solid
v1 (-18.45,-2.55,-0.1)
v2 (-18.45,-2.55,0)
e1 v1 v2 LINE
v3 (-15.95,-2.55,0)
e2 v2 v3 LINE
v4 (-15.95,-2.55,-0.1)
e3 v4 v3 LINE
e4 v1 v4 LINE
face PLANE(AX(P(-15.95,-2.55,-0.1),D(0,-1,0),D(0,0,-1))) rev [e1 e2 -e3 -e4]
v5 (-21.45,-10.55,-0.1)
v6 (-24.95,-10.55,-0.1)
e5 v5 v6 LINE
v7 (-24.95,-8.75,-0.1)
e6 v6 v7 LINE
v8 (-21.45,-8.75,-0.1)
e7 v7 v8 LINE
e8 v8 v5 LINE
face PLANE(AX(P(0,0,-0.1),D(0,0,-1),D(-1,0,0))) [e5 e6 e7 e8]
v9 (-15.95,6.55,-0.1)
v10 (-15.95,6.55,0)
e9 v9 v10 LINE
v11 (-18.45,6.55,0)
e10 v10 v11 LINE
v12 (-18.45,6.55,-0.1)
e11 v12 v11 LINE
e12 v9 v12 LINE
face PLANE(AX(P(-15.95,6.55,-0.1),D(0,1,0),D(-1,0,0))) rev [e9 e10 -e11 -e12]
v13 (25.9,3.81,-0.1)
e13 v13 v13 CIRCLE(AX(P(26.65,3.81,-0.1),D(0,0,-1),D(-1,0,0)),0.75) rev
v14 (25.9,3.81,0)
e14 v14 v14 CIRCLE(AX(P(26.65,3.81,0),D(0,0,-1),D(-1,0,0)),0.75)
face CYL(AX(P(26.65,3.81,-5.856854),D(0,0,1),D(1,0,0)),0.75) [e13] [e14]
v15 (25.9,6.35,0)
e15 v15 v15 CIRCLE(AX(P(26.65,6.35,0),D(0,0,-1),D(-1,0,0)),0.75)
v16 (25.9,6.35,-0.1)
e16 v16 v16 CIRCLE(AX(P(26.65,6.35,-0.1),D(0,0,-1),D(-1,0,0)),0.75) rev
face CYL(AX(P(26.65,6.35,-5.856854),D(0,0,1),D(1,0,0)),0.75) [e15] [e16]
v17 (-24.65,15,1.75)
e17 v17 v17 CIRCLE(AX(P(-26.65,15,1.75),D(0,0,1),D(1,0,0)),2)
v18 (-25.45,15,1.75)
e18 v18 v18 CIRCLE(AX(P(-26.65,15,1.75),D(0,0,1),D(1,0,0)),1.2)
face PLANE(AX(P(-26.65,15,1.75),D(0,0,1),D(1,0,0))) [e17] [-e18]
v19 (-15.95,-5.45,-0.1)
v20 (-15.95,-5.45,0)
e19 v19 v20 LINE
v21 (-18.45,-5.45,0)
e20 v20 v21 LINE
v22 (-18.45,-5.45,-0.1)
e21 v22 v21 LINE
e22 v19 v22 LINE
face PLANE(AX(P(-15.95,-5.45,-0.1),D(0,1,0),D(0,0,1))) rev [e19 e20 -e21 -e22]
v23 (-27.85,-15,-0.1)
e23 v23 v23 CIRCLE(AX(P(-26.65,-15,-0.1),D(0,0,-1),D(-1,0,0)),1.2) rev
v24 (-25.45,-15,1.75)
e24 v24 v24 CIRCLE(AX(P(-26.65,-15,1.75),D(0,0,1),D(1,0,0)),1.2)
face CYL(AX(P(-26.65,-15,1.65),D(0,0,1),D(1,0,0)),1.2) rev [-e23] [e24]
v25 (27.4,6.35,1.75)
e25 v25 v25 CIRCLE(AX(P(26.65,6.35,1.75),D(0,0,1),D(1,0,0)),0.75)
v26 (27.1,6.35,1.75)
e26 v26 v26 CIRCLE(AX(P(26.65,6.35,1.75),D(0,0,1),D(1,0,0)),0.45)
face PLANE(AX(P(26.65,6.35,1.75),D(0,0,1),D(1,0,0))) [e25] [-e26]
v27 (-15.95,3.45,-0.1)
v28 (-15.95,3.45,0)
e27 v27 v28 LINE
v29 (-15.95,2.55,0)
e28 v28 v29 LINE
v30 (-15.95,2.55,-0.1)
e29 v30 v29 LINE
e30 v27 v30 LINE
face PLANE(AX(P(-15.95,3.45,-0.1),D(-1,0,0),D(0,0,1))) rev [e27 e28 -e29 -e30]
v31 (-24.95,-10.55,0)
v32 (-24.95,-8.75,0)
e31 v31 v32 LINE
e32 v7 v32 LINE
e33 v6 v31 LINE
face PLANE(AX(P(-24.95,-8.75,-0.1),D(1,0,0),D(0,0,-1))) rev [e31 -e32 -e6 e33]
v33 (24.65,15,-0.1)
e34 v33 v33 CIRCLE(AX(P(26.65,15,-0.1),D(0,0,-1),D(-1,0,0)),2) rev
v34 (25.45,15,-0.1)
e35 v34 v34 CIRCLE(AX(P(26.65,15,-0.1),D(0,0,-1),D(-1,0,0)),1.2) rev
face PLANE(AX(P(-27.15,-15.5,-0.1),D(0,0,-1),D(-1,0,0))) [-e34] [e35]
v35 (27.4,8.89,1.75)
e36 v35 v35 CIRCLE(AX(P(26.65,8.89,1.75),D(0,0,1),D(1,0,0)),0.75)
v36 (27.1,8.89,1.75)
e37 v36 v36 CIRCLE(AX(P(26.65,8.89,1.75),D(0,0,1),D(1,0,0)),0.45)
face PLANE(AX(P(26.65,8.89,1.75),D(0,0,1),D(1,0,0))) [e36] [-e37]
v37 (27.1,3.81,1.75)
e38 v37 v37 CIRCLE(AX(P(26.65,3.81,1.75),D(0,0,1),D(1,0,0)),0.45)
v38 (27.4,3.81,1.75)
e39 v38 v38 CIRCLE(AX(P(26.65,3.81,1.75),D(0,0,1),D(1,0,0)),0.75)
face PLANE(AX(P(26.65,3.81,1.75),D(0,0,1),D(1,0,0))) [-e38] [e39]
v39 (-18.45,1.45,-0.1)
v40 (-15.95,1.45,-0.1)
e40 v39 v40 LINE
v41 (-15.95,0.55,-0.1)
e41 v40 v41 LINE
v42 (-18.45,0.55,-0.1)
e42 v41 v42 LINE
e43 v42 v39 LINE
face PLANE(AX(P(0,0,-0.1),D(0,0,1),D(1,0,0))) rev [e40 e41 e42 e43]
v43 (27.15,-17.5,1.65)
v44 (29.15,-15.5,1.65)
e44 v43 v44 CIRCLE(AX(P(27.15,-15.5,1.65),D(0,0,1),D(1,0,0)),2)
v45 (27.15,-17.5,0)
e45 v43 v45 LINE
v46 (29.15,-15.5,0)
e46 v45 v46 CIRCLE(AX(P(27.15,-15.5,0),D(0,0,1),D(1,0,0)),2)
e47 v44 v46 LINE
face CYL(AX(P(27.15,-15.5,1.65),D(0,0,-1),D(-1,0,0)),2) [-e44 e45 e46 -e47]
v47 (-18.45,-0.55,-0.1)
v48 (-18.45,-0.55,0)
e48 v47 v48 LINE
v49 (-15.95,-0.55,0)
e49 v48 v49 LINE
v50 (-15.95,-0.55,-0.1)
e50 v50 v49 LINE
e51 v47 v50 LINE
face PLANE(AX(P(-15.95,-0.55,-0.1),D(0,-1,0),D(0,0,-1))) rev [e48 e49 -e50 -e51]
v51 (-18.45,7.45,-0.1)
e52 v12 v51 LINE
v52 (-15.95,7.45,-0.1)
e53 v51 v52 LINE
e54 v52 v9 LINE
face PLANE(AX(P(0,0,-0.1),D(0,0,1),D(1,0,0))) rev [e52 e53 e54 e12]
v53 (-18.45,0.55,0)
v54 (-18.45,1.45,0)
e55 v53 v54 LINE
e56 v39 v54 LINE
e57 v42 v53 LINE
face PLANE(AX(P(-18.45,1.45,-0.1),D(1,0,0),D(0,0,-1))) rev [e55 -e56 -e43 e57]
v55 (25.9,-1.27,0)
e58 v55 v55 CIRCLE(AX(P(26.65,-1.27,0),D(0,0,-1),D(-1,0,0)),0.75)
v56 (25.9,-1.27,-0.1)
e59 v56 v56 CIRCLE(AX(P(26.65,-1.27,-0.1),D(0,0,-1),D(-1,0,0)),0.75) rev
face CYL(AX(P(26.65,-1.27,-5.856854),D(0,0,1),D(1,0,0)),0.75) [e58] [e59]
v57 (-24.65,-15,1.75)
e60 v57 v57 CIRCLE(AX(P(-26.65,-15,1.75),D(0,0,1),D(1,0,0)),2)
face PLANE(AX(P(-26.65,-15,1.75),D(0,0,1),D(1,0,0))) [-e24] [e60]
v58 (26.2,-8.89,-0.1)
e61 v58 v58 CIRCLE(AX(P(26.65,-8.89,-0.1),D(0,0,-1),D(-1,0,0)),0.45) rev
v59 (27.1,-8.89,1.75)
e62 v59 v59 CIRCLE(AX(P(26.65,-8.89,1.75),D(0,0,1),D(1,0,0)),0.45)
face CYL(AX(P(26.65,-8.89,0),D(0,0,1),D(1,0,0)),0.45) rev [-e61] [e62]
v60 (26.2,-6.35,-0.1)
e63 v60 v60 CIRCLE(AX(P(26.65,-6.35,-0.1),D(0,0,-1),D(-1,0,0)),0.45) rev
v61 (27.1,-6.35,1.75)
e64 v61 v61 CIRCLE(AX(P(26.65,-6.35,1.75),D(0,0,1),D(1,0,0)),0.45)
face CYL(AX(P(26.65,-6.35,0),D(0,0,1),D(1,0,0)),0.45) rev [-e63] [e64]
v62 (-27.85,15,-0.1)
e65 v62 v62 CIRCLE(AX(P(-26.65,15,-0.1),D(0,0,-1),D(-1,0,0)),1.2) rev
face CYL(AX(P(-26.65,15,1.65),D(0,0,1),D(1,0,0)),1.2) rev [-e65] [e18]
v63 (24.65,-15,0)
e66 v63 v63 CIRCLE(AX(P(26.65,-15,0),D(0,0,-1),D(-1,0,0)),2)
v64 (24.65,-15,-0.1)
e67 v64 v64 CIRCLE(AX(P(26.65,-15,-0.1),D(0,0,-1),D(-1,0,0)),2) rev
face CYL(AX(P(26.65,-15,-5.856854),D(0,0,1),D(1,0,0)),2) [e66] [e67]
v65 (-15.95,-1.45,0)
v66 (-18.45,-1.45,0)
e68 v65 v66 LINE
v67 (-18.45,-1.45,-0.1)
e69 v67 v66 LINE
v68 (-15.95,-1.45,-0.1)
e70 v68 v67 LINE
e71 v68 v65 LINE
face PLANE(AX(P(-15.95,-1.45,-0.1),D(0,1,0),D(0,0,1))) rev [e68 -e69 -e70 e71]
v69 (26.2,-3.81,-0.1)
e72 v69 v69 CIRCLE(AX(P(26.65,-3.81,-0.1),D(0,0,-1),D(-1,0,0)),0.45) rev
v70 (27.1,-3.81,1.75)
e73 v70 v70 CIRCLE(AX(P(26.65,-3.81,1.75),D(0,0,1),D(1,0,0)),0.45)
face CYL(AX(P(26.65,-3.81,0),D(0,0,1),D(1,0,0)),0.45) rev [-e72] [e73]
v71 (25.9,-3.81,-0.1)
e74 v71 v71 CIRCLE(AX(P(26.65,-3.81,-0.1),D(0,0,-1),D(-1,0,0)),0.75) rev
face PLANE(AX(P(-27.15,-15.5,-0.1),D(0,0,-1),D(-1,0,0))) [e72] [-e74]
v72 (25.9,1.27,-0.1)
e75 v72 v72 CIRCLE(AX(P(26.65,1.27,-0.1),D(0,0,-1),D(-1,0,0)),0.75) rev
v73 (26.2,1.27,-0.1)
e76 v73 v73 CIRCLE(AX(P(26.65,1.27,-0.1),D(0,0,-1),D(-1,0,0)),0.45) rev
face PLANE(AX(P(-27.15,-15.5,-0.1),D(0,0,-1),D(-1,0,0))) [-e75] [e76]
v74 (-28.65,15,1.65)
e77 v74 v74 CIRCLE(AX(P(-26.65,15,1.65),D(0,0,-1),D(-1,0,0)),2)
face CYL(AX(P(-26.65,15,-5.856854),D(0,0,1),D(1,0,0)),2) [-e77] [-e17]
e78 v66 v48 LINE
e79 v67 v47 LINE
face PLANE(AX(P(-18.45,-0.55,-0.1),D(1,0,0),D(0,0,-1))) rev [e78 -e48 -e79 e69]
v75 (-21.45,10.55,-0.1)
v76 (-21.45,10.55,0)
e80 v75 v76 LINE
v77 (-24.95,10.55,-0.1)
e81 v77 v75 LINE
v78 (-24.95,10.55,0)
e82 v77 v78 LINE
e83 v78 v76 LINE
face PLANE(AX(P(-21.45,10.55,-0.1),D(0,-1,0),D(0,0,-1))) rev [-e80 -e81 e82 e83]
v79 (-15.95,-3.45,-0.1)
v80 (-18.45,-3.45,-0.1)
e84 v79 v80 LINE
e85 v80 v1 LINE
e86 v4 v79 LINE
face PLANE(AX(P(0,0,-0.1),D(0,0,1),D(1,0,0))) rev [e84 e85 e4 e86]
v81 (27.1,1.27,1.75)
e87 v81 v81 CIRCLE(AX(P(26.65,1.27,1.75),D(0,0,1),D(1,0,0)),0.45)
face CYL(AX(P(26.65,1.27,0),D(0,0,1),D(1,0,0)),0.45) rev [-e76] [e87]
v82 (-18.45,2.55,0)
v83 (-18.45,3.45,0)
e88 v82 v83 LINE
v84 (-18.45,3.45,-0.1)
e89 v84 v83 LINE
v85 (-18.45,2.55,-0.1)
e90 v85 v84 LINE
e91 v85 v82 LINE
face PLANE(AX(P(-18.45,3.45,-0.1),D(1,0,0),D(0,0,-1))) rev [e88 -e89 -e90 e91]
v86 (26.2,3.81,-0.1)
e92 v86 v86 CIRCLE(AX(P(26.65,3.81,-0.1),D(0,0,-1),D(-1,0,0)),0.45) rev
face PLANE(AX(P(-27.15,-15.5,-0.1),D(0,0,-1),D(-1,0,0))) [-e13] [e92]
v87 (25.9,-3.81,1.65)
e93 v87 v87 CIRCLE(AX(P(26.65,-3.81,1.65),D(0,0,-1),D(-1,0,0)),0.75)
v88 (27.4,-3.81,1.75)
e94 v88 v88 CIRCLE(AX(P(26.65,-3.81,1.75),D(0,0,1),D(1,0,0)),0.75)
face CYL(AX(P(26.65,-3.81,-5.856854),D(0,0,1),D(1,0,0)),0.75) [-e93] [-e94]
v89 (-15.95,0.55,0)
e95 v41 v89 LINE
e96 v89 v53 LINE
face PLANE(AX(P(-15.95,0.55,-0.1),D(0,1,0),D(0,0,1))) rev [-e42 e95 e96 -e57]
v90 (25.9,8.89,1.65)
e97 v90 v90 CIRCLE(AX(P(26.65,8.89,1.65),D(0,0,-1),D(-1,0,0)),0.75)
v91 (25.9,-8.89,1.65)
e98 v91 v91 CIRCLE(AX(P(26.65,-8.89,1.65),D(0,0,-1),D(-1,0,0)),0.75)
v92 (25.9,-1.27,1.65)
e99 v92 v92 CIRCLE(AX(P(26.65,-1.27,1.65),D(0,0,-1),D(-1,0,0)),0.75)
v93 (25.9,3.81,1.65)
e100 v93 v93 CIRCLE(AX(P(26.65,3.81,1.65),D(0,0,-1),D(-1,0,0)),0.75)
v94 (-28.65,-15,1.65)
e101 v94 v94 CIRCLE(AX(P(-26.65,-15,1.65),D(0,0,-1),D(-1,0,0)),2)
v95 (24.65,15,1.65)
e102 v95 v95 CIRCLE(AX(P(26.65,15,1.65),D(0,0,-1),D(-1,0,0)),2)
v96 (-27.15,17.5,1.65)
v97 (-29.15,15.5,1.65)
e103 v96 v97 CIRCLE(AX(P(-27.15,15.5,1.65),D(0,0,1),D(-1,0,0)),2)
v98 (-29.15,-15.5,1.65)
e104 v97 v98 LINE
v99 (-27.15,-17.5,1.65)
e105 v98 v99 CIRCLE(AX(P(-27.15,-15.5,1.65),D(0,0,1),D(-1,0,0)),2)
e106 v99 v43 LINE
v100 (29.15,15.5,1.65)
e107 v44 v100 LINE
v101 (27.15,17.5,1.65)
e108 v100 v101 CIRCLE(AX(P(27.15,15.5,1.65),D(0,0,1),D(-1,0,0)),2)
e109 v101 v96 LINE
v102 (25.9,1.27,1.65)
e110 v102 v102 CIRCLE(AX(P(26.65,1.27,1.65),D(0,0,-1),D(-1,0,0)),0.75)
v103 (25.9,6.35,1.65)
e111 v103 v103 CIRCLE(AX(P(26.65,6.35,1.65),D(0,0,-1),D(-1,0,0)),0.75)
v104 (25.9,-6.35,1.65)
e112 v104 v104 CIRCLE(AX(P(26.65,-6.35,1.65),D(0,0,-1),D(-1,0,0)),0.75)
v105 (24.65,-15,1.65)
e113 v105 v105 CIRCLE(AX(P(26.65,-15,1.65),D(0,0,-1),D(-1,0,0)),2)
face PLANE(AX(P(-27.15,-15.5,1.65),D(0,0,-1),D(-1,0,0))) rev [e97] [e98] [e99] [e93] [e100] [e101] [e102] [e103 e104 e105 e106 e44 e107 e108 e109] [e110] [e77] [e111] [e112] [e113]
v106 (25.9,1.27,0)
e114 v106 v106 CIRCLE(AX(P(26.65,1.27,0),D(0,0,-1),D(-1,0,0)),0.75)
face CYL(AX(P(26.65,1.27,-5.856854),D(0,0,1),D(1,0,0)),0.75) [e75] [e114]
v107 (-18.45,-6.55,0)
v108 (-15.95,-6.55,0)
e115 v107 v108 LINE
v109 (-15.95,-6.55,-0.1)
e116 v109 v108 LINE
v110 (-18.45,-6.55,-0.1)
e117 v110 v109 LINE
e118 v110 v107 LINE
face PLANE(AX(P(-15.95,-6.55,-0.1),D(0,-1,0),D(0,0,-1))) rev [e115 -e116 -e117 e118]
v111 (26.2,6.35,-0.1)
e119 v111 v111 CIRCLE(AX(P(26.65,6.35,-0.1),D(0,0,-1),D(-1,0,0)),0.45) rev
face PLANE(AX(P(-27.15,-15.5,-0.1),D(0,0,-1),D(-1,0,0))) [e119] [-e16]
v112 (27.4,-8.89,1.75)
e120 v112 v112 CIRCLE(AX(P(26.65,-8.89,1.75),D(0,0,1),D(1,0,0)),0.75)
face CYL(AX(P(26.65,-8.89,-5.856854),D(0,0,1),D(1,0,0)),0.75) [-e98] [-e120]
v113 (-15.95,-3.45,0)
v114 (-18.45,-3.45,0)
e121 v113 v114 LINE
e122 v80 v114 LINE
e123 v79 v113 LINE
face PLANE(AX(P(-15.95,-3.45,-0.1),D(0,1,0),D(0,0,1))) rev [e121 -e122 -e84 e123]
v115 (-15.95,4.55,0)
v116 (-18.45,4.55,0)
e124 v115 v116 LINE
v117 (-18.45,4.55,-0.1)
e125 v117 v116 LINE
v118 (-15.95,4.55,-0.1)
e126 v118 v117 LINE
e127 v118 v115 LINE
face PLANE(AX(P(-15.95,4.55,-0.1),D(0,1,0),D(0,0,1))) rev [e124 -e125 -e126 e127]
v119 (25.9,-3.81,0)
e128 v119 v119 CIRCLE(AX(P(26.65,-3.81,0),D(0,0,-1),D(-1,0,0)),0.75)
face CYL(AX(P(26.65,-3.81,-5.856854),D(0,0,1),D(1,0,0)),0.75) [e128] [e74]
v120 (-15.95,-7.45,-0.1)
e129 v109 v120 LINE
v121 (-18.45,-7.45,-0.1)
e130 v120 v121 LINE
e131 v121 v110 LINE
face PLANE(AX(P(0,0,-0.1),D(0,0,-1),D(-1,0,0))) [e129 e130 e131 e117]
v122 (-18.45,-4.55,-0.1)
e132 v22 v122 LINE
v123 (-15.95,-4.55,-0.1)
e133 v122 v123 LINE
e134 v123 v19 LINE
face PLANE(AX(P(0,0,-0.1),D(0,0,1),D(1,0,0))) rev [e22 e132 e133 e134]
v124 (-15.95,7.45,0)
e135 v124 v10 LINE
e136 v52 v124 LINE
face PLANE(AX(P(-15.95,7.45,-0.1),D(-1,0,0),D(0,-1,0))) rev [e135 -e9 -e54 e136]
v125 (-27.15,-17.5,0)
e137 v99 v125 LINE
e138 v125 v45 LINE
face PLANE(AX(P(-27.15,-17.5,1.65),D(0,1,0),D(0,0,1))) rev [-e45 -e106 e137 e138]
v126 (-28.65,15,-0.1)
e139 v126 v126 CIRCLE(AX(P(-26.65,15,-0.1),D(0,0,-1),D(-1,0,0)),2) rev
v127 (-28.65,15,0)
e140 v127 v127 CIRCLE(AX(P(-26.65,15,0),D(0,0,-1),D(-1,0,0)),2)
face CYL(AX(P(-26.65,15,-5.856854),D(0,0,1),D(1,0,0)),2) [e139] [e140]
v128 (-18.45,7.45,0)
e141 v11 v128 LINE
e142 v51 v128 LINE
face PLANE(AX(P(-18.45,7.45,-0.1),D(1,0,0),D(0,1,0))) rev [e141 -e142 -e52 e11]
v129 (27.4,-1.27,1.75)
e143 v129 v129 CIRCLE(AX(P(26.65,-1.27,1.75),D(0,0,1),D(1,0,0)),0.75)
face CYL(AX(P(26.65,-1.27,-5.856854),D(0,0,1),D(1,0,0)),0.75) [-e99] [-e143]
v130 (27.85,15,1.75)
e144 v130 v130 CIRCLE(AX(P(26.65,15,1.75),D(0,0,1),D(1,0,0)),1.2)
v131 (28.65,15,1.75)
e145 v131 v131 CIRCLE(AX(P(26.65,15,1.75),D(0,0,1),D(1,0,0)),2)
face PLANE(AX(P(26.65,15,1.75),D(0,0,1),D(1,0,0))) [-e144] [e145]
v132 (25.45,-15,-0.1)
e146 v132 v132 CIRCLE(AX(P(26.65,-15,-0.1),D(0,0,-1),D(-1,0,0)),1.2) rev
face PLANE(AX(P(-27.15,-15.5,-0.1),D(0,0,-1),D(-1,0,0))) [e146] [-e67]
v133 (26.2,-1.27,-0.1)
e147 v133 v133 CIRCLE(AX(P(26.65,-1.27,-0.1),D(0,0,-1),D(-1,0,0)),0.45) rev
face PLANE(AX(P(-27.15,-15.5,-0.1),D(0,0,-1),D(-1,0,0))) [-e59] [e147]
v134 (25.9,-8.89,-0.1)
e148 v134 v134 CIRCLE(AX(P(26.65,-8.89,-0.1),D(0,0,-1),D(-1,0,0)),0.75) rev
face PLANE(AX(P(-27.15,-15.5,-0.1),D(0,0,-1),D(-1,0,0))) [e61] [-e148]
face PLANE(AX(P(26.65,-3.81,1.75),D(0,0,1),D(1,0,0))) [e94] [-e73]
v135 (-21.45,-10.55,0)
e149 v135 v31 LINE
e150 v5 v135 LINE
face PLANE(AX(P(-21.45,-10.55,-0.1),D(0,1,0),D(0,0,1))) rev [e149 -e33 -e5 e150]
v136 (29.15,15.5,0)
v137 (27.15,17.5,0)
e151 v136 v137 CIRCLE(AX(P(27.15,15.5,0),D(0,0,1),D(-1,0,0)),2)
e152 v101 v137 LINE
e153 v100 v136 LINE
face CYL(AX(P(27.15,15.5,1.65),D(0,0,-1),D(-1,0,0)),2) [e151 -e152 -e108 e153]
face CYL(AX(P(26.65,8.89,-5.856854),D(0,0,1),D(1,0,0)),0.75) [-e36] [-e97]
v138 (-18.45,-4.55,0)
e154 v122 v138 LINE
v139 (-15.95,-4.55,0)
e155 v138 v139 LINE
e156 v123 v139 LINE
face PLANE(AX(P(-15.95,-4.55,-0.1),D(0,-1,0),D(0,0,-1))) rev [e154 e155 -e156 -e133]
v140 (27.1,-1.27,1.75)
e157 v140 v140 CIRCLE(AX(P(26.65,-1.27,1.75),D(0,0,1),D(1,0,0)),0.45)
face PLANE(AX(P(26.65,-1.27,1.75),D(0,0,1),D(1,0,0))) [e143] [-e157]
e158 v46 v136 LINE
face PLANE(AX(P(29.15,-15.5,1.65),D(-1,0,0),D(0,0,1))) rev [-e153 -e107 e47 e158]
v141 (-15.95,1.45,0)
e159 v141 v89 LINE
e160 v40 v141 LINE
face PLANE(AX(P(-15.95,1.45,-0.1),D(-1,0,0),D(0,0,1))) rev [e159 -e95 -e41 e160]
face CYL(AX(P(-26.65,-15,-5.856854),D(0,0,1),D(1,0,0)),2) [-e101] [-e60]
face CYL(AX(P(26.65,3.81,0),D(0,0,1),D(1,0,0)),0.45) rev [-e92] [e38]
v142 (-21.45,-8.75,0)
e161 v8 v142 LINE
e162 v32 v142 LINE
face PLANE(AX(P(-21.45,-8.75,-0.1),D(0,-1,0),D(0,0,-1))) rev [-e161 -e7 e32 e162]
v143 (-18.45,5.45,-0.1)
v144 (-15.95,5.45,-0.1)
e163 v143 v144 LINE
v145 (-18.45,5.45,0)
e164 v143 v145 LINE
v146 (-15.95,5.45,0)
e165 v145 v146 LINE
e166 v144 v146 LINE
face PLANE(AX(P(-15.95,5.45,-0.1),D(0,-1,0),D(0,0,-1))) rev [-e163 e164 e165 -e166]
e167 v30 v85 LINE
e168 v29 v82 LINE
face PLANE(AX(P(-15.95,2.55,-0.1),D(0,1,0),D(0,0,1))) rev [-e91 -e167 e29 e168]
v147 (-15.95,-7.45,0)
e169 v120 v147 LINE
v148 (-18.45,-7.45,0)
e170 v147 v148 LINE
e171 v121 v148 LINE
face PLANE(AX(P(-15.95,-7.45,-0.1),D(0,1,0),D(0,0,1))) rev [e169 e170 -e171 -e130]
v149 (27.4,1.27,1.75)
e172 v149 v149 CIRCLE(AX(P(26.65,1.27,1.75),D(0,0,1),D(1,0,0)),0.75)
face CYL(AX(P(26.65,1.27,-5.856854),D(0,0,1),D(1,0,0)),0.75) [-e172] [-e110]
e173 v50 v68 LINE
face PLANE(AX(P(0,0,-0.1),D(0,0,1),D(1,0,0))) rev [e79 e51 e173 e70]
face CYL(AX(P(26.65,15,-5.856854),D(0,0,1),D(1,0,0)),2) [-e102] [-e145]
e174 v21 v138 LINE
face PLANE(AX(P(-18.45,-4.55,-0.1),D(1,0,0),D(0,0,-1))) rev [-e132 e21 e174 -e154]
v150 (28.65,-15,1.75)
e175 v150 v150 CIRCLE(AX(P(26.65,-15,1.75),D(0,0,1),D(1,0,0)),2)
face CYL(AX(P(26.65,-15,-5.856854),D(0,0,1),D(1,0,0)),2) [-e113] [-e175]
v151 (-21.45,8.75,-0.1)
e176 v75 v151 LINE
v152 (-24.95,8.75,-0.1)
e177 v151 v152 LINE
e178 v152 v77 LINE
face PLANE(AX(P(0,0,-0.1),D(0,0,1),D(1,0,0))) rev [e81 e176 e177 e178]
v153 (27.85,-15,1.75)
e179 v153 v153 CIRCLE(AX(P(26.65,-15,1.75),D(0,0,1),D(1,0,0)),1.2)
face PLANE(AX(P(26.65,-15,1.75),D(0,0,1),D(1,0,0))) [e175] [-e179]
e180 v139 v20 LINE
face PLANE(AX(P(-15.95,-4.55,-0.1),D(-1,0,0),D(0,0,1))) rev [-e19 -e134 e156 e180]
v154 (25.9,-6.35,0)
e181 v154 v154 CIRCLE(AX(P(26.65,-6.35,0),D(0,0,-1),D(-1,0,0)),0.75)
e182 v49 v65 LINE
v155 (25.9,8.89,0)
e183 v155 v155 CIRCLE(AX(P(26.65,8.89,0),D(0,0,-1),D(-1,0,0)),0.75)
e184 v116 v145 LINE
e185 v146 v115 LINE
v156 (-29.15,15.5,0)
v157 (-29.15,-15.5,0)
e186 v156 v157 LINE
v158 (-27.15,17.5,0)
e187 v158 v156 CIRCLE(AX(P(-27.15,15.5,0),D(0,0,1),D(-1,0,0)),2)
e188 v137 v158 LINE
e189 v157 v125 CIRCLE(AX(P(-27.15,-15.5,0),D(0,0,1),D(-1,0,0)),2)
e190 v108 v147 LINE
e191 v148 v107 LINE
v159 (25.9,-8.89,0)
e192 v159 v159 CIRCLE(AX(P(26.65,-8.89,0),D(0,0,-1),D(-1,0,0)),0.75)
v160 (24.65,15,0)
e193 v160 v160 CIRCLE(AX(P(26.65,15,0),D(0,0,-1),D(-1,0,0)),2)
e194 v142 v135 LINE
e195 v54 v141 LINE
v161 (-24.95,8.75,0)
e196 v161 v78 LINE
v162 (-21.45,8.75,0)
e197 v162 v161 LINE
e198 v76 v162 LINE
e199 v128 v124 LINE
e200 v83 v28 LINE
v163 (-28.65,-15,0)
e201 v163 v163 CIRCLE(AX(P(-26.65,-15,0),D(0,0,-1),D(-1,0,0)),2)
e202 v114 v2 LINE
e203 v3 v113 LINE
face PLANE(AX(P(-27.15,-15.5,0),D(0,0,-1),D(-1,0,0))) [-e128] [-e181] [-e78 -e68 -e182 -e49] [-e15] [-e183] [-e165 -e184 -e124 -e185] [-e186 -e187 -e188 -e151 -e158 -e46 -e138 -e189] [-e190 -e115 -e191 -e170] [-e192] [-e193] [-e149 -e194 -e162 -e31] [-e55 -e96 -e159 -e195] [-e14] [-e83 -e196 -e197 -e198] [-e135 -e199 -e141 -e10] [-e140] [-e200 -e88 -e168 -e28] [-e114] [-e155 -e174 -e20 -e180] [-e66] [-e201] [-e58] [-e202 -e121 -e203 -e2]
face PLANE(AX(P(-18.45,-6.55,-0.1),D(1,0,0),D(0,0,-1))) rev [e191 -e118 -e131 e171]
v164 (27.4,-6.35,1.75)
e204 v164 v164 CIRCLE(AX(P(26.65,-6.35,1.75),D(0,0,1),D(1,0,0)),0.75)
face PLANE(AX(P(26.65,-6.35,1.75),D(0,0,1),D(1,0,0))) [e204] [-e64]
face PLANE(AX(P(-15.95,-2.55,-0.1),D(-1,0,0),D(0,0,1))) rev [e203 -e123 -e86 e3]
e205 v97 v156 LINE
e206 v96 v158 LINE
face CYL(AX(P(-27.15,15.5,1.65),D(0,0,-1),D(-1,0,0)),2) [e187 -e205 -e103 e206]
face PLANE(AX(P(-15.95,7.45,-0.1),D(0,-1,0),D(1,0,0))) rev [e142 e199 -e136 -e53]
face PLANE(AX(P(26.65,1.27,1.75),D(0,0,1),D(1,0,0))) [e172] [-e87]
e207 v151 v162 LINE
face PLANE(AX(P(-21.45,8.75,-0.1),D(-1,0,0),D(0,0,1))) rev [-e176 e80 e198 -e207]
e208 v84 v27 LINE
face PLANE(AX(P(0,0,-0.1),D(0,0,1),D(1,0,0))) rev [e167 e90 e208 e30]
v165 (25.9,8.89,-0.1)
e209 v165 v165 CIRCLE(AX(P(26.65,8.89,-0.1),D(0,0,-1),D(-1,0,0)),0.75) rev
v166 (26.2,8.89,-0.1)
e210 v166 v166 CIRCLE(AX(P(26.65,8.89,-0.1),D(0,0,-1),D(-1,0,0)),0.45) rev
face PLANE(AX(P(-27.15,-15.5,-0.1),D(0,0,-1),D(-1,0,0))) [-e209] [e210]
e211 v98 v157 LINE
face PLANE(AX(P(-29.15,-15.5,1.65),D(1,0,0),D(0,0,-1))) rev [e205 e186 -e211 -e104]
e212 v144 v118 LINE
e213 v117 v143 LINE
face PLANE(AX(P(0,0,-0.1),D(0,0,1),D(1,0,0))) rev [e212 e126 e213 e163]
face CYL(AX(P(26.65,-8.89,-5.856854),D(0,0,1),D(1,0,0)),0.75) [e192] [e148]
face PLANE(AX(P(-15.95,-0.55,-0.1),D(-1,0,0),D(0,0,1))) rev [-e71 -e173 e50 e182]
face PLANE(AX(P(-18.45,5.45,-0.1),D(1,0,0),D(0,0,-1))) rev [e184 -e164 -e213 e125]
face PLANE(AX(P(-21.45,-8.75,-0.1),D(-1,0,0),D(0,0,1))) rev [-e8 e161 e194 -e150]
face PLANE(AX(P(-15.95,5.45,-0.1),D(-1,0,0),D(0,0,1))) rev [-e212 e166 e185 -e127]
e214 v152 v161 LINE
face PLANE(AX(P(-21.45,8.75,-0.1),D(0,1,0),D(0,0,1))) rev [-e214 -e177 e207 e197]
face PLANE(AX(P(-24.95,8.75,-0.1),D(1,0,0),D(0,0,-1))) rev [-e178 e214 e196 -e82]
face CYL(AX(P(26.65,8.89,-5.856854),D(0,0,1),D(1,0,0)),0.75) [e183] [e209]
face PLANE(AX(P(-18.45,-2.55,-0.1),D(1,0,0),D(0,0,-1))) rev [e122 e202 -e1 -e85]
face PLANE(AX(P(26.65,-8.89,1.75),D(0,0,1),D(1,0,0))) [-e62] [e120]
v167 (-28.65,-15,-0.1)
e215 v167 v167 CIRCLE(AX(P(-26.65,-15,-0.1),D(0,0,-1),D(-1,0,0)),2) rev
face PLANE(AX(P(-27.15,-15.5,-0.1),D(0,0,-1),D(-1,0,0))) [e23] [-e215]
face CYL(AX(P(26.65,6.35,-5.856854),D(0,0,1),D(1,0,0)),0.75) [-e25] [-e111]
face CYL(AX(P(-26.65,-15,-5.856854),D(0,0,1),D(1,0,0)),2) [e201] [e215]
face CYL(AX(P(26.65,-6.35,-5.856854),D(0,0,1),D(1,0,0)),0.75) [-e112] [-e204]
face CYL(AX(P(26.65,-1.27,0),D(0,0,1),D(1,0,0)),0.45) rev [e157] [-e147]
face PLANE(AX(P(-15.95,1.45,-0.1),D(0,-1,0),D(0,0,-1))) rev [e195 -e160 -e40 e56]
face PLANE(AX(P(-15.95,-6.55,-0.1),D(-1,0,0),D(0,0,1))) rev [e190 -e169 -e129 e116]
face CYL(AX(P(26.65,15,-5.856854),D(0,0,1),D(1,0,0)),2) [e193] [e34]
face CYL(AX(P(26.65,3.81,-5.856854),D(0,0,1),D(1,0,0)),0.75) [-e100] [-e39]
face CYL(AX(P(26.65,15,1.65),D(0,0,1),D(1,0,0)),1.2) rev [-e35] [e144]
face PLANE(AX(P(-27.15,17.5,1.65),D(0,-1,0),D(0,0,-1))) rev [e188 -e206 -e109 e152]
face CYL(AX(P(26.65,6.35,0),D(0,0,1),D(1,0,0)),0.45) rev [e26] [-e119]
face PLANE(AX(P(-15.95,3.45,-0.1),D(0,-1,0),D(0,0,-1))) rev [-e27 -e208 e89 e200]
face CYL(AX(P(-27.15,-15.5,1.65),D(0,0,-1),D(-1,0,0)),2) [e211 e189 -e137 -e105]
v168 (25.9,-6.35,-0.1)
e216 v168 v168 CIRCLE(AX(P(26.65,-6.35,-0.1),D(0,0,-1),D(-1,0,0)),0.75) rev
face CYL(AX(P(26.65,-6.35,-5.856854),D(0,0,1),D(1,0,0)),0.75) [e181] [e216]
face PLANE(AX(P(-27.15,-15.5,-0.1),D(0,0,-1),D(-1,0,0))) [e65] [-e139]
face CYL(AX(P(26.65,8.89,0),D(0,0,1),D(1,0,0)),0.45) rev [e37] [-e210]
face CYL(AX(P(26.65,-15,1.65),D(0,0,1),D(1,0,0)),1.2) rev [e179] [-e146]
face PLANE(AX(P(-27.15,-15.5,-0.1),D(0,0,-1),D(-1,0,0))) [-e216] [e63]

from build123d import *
from build123d.topology import SkipClean

# Parameters (mm, degrees)
EXTRUDE_1_DEPTH       = 1.65
HOLE_WIZARD_M21_D     = 2.4
HOLE_WIZARD_M21_DEPTH = 10
HOLE_WIZARD_M21_TIP   = 0.721032743
SKETCH_5_R            = 0.45
CUT_EXTRUDE_1_DEPTH   = 35.039609281
EXTRUDE_2_DEPTH       = 0.1
EXTRUDE_2_DEPTH_BACK  = 1.75
SKETCH_6_R            = 2
SKETCH_6_R_2          = 1.2
SKETCH_6_R_3          = 0.75
SKETCH_6_R_4          = 0.45
SKETCH_7_W            = 2.5
SKETCH_7_H            = 0.9
SKETCH_7_W_2          = 3.5
SKETCH_7_H_2          = 1.8
EXTRUDE_3_DEPTH       = 0.1


with BuildPart() as part:
    # Эскиз1 → Бобышка-Вытянуть1 (new body)
    with BuildSketch(Plane.XY):
        with BuildLine():
            Line((-27.15, -17.5), (27.15, -17.5))
            ThreePointArc((27.15, -17.5), (28.564213562, -16.914213562), (29.15, -15.5))
            Line((29.15, -15.5), (29.15, 15.5))
            ThreePointArc((29.15, 15.5), (28.564213562, 16.914213562), (27.15, 17.5))
            Line((27.15, 17.5), (-27.15, 17.5))
            ThreePointArc((-27.15, 17.5), (-28.564213562, 16.914213562), (-29.15, 15.5))
            Line((-29.15, 15.5), (-29.15, -15.5))
            ThreePointArc((-29.15, -15.5), (-28.564213562, -16.914213562), (-27.15, -17.5))
        make_face()
    extrude(amount=EXTRUDE_1_DEPTH)

    # Отверстие с зазором M21
    with Locations(Plane.XY.offset(1.65)):
        with Locations((26.65, 15), (-26.65, -15), (-26.65, 15), (26.65, -15)):
            Hole(HOLE_WIZARD_M21_D / 2, depth=HOLE_WIZARD_M21_DEPTH)
            with Locations((0, 0, -(HOLE_WIZARD_M21_DEPTH + HOLE_WIZARD_M21_TIP / 2))):  # 118° drill point
                Cone(0, HOLE_WIZARD_M21_D / 2, HOLE_WIZARD_M21_TIP, mode=Mode.SUBTRACT)

    # Эскиз5 → Вырез-Вытянуть1 (cut, through all)
    with BuildSketch(Plane.XY.offset(1.65)):
        with Locations((26.65, -8.89)):
            Circle(SKETCH_5_R)
        with Locations((26.65, -6.35)):
            Circle(SKETCH_5_R)
        with Locations((26.65, -3.81)):
            Circle(SKETCH_5_R)
        with Locations((26.65, -1.27)):
            Circle(SKETCH_5_R)
        with Locations((26.65, 1.27)):
            Circle(SKETCH_5_R)
        with Locations((26.65, 3.81)):
            Circle(SKETCH_5_R)
        with Locations((26.65, 6.35)):
            Circle(SKETCH_5_R)
        with Locations((26.65, 8.89)):
            Circle(SKETCH_5_R)
    extrude(amount=-CUT_EXTRUDE_1_DEPTH, mode=Mode.SUBTRACT)

    # Эскиз6 → Бобышка-Вытянуть2 (add, two sides: drawn at the far end of the back side and taken through both)
    # profile 1 of 12: a face of its own
    with SkipClean():  # the faces are left unmerged after this step: merging them gives an invalid solid
        with BuildSketch(Plane.XY.offset(1.65).offset(-EXTRUDE_2_DEPTH_BACK)):
            with Locations(Location((-26.65, 15, 0), (0, 0, 180))):
                Circle(SKETCH_6_R)
            with Locations((-26.65, 15)):
                Circle(SKETCH_6_R_2, mode=Mode.SUBTRACT)
        # profile 2 of 12: a face of its own
        with BuildSketch(Plane.XY.offset(1.65).offset(-EXTRUDE_2_DEPTH_BACK)):
            with Locations(Location((26.65, 15, 0), (0, 0, 180))):
                Circle(SKETCH_6_R)
            with Locations((26.65, 15)):
                Circle(SKETCH_6_R_2, mode=Mode.SUBTRACT)
        # profile 3 of 12: a face of its own
        with BuildSketch(Plane.XY.offset(1.65).offset(-EXTRUDE_2_DEPTH_BACK)):
            with Locations(Location((26.65, -15, 0), (0, 0, 180))):
                Circle(SKETCH_6_R)
            with Locations((26.65, -15)):
                Circle(SKETCH_6_R_2, mode=Mode.SUBTRACT)
        # profile 4 of 12: a face of its own
        with BuildSketch(Plane.XY.offset(1.65).offset(-EXTRUDE_2_DEPTH_BACK)):
            with Locations(Location((-26.65, -15, 0), (0, 0, 180))):
                Circle(SKETCH_6_R)
            with Locations((-26.65, -15)):
                Circle(SKETCH_6_R_2, mode=Mode.SUBTRACT)
        # profile 5 of 12: a face of its own
        with BuildSketch(Plane.XY.offset(1.65).offset(-EXTRUDE_2_DEPTH_BACK)):
            with Locations(Location((26.65, -8.89, 0), (0, 0, 180))):
                Circle(SKETCH_6_R_3)
            with Locations((26.65, -8.89)):
                Circle(SKETCH_6_R_4, mode=Mode.SUBTRACT)
        # profile 6 of 12: a face of its own
        with BuildSketch(Plane.XY.offset(1.65).offset(-EXTRUDE_2_DEPTH_BACK)):
            with Locations(Location((26.65, -6.35, 0), (0, 0, 180))):
                Circle(SKETCH_6_R_3)
            with Locations((26.65, -6.35)):
                Circle(SKETCH_6_R_4, mode=Mode.SUBTRACT)
        # profile 7 of 12: a face of its own
        with BuildSketch(Plane.XY.offset(1.65).offset(-EXTRUDE_2_DEPTH_BACK)):
            with Locations(Location((26.65, -3.81, 0), (0, 0, 180))):
                Circle(SKETCH_6_R_3)
            with Locations((26.65, -3.81)):
                Circle(SKETCH_6_R_4, mode=Mode.SUBTRACT)
        # profile 8 of 12: a face of its own
        with BuildSketch(Plane.XY.offset(1.65).offset(-EXTRUDE_2_DEPTH_BACK)):
            with Locations(Location((26.65, -1.27, 0), (0, 0, 180))):
                Circle(SKETCH_6_R_3)
            with Locations((26.65, -1.27)):
                Circle(SKETCH_6_R_4, mode=Mode.SUBTRACT)
        # profile 9 of 12: a face of its own
        with BuildSketch(Plane.XY.offset(1.65).offset(-EXTRUDE_2_DEPTH_BACK)):
            with Locations(Location((26.65, 1.27, 0), (0, 0, 180))):
                Circle(SKETCH_6_R_3)
            with Locations((26.65, 1.27)):
                Circle(SKETCH_6_R_4, mode=Mode.SUBTRACT)
        # profile 10 of 12: a face of its own
        with BuildSketch(Plane.XY.offset(1.65).offset(-EXTRUDE_2_DEPTH_BACK)):
            with Locations(Location((26.65, 3.81, 0), (0, 0, 180))):
                Circle(SKETCH_6_R_3)
            with Locations((26.65, 3.81)):
                Circle(SKETCH_6_R_4, mode=Mode.SUBTRACT)
        # profile 11 of 12: a face of its own
        with BuildSketch(Plane.XY.offset(1.65).offset(-EXTRUDE_2_DEPTH_BACK)):
            with Locations(Location((26.65, 6.35, 0), (0, 0, 180))):
                Circle(SKETCH_6_R_3)
            with Locations((26.65, 6.35)):
                Circle(SKETCH_6_R_4, mode=Mode.SUBTRACT)
        # profile 12 of 12: a face of its own
        with BuildSketch(Plane.XY.offset(1.65).offset(-EXTRUDE_2_DEPTH_BACK)):
            with Locations(Location((26.65, 8.89, 0), (0, 0, 180))):
                Circle(SKETCH_6_R_3)
            with Locations((26.65, 8.89)):
                Circle(SKETCH_6_R_4, mode=Mode.SUBTRACT)
        extrude(amount=EXTRUDE_2_DEPTH + EXTRUDE_2_DEPTH_BACK)
    add(part.part.scale(1), mode=Mode.REPLACE)  # the faces are merged on a copy

    # Эскиз7 → Бобышка-Вытянуть3 (add)
    with BuildSketch(Plane(origin=(0, 0, 0), x_dir=(-1, 0, 0), z_dir=(0, 0, -1))):
        with Locations((17.2, -5)):
            Rectangle(SKETCH_7_W, SKETCH_7_H)
        with Locations((17.2, -7)):
            Rectangle(SKETCH_7_W, SKETCH_7_H)
        with Locations((17.2, -3)):
            Rectangle(SKETCH_7_W, SKETCH_7_H)
        with Locations((17.2, -1)):
            Rectangle(SKETCH_7_W, SKETCH_7_H)
        with Locations((17.2, 1)):
            Rectangle(SKETCH_7_W, SKETCH_7_H)
        with Locations((17.2, 3)):
            Rectangle(SKETCH_7_W, SKETCH_7_H)
        with Locations((17.2, 5)):
            Rectangle(SKETCH_7_W, SKETCH_7_H)
        with Locations((17.2, 7)):
            Rectangle(SKETCH_7_W, SKETCH_7_H)
        with Locations((23.2, -9.65)):
            Rectangle(SKETCH_7_W_2, SKETCH_7_H_2)
        with Locations((23.2, 9.65)):
            Rectangle(SKETCH_7_W_2, SKETCH_7_H_2)
    extrude(amount=EXTRUDE_3_DEPTH)


solid = part.part
